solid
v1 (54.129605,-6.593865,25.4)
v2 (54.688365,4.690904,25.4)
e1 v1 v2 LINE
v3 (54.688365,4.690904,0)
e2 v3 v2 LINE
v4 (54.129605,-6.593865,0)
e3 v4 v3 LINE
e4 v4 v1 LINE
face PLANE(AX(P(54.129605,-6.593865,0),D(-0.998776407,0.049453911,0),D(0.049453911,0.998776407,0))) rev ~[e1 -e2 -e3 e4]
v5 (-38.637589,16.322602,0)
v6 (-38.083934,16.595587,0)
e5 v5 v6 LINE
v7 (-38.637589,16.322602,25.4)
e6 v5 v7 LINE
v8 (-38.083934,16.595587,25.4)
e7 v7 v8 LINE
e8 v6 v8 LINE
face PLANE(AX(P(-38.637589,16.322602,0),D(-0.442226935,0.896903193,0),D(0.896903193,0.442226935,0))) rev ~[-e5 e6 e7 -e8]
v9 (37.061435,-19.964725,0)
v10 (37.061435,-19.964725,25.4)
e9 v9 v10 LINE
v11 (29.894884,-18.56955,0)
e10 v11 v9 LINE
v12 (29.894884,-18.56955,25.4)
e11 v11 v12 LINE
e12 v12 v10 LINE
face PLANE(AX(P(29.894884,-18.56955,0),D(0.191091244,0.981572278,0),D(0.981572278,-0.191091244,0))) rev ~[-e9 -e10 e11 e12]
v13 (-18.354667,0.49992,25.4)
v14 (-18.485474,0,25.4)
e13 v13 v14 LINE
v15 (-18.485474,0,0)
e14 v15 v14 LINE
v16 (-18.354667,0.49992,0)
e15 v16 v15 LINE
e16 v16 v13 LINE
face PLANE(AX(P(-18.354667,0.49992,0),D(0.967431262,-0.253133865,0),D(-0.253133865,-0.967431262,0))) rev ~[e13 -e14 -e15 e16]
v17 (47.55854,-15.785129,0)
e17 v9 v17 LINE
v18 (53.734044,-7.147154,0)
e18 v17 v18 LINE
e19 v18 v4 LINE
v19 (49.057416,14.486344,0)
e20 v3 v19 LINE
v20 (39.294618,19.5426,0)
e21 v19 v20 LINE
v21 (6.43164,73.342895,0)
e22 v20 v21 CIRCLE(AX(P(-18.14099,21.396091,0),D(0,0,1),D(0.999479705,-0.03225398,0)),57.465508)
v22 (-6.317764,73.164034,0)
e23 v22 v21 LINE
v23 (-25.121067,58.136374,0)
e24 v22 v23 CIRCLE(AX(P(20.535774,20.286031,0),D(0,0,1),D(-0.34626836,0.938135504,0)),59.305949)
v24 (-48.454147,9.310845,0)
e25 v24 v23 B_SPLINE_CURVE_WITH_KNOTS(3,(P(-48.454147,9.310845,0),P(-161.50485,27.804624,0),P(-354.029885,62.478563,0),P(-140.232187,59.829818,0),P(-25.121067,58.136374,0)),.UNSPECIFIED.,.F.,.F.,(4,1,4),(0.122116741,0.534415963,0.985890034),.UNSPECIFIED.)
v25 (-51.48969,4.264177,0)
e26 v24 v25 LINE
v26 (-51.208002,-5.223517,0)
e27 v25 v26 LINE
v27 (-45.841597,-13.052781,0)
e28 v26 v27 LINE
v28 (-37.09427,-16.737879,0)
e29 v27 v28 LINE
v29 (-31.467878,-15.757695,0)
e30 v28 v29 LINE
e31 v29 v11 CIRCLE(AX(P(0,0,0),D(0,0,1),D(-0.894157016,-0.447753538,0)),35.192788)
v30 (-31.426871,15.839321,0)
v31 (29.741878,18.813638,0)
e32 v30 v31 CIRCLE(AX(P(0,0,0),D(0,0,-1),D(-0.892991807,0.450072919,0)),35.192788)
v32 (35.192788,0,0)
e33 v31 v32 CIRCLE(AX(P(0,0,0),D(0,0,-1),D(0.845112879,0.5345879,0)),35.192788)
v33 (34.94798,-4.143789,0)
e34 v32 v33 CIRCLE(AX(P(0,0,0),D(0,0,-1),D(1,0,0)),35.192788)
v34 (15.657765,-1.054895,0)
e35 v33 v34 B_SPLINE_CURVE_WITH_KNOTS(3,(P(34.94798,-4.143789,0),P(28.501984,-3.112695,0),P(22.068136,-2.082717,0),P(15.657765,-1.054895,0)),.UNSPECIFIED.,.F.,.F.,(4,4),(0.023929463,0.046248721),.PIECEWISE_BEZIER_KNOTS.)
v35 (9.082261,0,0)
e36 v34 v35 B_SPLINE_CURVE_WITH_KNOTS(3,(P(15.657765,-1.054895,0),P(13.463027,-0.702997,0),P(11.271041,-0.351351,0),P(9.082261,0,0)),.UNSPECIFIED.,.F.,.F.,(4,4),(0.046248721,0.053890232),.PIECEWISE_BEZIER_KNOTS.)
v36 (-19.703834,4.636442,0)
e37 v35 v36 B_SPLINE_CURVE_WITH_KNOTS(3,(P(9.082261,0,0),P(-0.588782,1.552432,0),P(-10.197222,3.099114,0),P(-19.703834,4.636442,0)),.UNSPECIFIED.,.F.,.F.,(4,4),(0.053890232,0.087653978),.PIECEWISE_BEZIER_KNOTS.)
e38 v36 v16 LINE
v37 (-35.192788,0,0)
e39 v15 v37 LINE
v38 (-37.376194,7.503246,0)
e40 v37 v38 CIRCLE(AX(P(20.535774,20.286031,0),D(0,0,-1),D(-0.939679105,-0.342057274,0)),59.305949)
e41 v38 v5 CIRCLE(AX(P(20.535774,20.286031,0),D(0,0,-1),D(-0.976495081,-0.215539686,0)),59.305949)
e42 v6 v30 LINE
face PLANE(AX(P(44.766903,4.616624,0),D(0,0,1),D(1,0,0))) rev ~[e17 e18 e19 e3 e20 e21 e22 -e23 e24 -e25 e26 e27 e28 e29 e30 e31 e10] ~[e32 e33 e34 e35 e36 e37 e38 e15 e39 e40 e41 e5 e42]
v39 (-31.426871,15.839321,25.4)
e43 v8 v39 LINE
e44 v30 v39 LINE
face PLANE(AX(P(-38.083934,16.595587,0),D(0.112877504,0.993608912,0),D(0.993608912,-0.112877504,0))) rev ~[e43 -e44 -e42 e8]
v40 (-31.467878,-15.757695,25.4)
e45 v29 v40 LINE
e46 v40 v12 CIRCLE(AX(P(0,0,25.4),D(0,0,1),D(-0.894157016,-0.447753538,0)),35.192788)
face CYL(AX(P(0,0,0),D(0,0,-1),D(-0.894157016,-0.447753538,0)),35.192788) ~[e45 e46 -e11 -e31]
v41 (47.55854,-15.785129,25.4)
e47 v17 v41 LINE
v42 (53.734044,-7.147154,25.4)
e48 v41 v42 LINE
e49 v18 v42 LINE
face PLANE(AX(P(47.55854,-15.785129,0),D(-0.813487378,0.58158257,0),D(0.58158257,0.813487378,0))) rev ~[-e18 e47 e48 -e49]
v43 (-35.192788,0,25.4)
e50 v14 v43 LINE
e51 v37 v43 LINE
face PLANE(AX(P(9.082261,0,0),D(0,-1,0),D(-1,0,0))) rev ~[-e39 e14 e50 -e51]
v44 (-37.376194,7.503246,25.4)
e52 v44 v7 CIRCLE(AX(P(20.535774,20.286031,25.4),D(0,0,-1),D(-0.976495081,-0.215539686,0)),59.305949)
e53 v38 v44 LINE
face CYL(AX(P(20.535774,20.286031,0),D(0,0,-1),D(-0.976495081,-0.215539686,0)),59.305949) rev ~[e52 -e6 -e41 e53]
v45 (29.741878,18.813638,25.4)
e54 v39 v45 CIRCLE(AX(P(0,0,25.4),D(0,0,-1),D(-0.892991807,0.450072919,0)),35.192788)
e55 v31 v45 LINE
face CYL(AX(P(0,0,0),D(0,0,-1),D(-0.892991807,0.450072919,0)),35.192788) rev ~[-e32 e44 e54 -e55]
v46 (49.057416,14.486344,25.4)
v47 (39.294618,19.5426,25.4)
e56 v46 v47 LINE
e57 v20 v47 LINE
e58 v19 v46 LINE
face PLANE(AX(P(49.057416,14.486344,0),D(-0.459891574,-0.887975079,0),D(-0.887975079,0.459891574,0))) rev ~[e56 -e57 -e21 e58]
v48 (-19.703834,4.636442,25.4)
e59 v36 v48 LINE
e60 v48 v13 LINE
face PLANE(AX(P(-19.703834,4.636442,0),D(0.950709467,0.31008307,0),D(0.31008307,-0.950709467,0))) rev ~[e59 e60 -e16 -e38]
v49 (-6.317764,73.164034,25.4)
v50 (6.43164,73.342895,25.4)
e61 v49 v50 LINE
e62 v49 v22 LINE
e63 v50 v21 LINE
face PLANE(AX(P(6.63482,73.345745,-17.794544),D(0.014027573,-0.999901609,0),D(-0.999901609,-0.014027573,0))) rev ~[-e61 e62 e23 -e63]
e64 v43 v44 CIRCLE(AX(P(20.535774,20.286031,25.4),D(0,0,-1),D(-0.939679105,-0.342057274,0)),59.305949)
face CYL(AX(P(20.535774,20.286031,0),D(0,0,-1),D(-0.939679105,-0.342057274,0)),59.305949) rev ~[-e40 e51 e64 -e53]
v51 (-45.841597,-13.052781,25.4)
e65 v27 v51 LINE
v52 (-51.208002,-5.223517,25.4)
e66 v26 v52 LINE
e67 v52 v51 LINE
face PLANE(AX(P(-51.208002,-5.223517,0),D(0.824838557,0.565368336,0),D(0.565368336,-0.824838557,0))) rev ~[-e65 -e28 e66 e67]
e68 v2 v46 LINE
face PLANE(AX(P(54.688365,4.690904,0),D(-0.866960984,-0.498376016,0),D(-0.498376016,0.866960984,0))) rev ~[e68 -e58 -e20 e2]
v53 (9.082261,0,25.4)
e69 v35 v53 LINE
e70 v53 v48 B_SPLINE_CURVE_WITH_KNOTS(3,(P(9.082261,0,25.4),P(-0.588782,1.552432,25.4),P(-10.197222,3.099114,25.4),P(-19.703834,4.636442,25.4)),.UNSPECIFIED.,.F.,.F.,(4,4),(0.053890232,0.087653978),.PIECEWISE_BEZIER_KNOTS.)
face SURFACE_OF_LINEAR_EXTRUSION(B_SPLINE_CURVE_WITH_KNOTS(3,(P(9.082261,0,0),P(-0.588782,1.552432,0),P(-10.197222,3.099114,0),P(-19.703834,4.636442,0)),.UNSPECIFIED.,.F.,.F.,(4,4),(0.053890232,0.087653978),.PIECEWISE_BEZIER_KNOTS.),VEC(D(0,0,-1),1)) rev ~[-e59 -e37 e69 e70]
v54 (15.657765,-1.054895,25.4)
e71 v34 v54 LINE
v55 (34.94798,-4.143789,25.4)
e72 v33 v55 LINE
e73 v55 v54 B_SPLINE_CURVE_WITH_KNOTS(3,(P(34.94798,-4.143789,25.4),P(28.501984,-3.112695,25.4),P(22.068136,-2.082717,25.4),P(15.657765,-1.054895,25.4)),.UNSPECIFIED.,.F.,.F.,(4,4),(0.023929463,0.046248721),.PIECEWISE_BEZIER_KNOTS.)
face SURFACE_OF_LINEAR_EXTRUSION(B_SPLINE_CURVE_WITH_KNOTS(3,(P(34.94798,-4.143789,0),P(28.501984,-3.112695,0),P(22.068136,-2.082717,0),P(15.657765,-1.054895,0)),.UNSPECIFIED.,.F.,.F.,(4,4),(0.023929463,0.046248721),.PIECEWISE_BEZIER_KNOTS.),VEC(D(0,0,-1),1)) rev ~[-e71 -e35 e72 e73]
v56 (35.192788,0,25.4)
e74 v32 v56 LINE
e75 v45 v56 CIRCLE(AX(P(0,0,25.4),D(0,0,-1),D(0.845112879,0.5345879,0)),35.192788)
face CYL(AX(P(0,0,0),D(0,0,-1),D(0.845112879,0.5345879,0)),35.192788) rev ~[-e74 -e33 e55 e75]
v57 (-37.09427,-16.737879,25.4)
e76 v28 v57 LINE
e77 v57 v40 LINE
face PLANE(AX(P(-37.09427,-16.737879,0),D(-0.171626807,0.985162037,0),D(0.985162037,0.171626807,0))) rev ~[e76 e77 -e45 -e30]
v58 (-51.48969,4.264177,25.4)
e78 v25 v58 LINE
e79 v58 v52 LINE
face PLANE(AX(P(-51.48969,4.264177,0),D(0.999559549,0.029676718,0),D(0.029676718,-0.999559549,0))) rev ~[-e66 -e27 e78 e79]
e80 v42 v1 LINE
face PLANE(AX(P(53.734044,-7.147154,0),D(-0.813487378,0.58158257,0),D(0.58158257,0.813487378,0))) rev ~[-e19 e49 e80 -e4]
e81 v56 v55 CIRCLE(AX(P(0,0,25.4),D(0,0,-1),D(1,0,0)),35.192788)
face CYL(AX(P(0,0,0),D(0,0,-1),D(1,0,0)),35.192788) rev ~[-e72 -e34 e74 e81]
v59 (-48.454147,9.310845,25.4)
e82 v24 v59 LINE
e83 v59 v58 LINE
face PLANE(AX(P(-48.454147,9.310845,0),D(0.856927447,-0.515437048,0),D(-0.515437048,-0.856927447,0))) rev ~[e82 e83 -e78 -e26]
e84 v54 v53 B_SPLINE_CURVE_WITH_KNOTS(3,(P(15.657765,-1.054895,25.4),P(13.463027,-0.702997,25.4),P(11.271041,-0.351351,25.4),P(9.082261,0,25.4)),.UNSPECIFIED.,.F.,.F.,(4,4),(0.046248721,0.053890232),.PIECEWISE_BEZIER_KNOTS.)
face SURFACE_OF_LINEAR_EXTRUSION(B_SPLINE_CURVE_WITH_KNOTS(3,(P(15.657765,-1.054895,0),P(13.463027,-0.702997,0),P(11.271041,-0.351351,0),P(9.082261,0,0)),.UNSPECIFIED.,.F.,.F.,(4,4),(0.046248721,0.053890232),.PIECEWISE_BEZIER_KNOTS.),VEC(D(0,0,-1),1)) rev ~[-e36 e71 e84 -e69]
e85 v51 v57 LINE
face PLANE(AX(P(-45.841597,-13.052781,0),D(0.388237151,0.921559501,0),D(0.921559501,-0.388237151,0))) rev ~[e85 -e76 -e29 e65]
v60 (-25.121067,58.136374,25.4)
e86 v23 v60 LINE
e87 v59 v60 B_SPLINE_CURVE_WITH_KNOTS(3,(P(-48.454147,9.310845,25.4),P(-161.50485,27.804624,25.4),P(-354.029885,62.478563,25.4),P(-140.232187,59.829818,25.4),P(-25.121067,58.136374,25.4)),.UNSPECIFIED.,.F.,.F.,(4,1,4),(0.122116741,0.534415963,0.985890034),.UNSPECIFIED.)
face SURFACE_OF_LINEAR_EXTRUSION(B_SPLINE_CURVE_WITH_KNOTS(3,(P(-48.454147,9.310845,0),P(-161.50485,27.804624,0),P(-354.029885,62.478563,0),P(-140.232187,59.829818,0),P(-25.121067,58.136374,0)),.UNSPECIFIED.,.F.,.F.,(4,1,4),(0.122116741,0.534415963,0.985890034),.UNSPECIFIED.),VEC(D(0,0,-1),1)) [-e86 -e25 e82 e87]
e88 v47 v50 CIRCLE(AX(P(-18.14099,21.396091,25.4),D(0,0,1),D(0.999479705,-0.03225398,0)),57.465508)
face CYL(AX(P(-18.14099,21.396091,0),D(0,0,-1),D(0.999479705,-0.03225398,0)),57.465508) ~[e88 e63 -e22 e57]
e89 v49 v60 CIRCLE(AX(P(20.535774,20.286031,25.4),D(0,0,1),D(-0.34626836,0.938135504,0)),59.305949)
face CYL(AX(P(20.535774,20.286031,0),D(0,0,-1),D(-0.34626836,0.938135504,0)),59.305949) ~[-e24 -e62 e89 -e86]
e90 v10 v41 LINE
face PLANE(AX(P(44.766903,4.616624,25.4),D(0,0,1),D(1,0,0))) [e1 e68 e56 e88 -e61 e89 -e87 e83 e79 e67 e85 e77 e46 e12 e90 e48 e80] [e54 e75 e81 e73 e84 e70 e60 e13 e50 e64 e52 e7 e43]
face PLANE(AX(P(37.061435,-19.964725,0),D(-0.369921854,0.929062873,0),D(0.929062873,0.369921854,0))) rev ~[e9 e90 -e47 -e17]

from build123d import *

# Parameters (mm, degrees)
F1_DEPTH    = 25.4
F2_DEPTH    = 25.4
F3_T1_DEPTH = 60.9890887747


# Not quite as in the source:
# - a fillet or chamfer that OpenCascade refuses, or shapes differently, is made with other operations: its cross-section is extruded or revolved along the edge and cut away or added


with BuildPart() as f1:
    # F0 (on Top) → F1 (new body)
    with BuildSketch(Plane.XY):
        with BuildLine():
            Line((0, 0), (9.0822612578, 0))
            add(Edge.make_bspline(
                [(9.0822612578, 0), (-0.5887823283, 1.5524321895), (-10.1972217153, 3.0991138841), (-19.7038336111, 4.636442237)],
                knots=[0.053890232, 0.053890232, 0.053890232, 0.053890232, 0.0876539783, 0.0876539783, 0.0876539783, 0.0876539783], degree=3))
            Line((-19.7038336111, 4.636442237), (-18.3546670651, 0.4999203421))
            Line((-18.3546670651, 0.4999203421), (-18.4854740521, 0))
            Line((-18.4854740521, 0), (0, 0))
        make_face()
    extrude(amount=F1_DEPTH)

    # F0 (on Top) → F2 (join)
    with BuildSketch(Plane.XY):
        with BuildLine():
            ThreePointArc((39.2946183394, 19.5425995517), (38.0990536847, 9.5917687024), (35.1927875929, 0))
            ThreePointArc((35.1927875929, 0), (35.1315324061, -2.0755070121), (34.9479800825, -4.1437889318))
            add(Edge.make_bspline(
                [(53.7340444048, -7.1471543317), (47.4674866948, -6.1456158537), (41.202016032, -5.1441772263), (34.9479800825, -4.1437889318)],
                knots=[0.0022748674, 0.0022748674, 0.0022748674, 0.0022748674, 0.0239294634, 0.0239294634, 0.0239294634, 0.0239294634], degree=3))
            Line((53.7340444048, -7.1471543317), (54.1296049181, -6.5938649088))
            Line((54.1296049181, -6.5938649088), (54.6883645828, 4.6909042491))
            Line((54.6883645828, 4.6909042491), (49.0574163024, 14.4863444523))
            Line((49.0574163024, 14.4863444523), (39.2946183394, 19.5425995517))
        make_face()
        with BuildLine():
            ThreePointArc((29.7418780254, 18.8136384064), (33.8026026699, 9.793689361), (35.1927875929, 0))
            ThreePointArc((35.1927875929, 0), (38.0990536847, 9.5917687024), (39.2946183394, 19.5425995517))
            Line((39.2946183394, 19.5425995517), (39.0245463695, 19.6824726475))
            Line((39.0245463695, 19.6824726475), (29.7418780254, 18.8136384064))
        make_face()
        with BuildLine():
            ThreePointArc((-31.426870984, 15.839320652), (-1.7092225846, 35.1512568298), (29.7418780254, 18.8136384064))
            Line((29.7418780254, 18.8136384064), (39.0245463695, 19.6824726475))
            Line((39.0245463695, 19.6824726475), (39.2946183394, 19.5425995517))
            ThreePointArc((39.2946183394, 19.5425995517), (29.0039385515, 54.2539705519), (0, 75.9230479598))
            ThreePointArc((0, 75.9230479598), (-13.7345779986, 68.6878764709), (-25.1210674885, 58.1363743803))
            ThreePointArc((-25.1210674885, 58.1363743803), (-35.8950760367, 38.527599561), (-38.637588859, 16.3226016208))
            Line((-38.637588859, 16.3226016208), (-38.0839338665, 16.5955866568))
            Line((-38.0839338665, 16.5955866568), (-31.426870984, 15.839320652))
        make_face()
        with BuildLine():
            add(Edge.make_bspline(
                [(53.7340444048, -7.1471543317), (47.4674866948, -6.1456158537), (41.202016032, -5.1441772263), (34.9479800825, -4.1437889318)],
                knots=[0.0022748674, 0.0022748674, 0.0022748674, 0.0022748674, 0.0239294634, 0.0239294634, 0.0239294634, 0.0239294634], degree=3))
            ThreePointArc((34.9479800825, -4.1437889318), (33.2140769684, -11.6343194773), (29.8948841627, -18.56955033))
            Line((29.8948841627, -18.56955033), (37.0614353142, -19.964725406))
            Line((37.0614353142, -19.964725406), (47.5585395538, -15.7851285483))
            Line((47.5585395538, -15.7851285483), (53.7340444048, -7.1471543317))
        make_face()
        with BuildLine():
            ThreePointArc((29.8948841627, -18.56955033), (33.2140769684, -11.6343194773), (34.9479800825, -4.1437889318))
            add(Edge.make_bspline(
                [(34.9479800825, -4.1437889318), (28.5019841788, -3.1126949471), (22.0681357101, -2.0827167623), (15.6577647144, -1.0548950957)],
                knots=[0.0239294634, 0.0239294634, 0.0239294634, 0.0239294634, 0.0462487206, 0.0462487206, 0.0462487206, 0.0462487206], degree=3))
            Line((15.6577647144, -1.0548950956), (17.8084989026, -9.9934284194))
            Line((17.8084989026, -9.9934284194), (25.9710486263, -17.8056630113))
            Line((25.9710486263, -17.8056630113), (29.8948841627, -18.56955033))
        make_face()
        with BuildLine():
            ThreePointArc((-31.4678779331, -15.7576951661), (-1.6109654608, -35.1558969285), (29.8948841627, -18.56955033))
            Line((29.8948841627, -18.56955033), (25.9710486263, -17.8056630113))
            Line((25.9710486263, -17.8056630113), (17.8084989026, -9.9934284194))
            Line((17.8084989026, -9.9934284194), (15.6577647144, -1.0548950956))
            add(Edge.make_bspline(
                [(15.6577647144, -1.0548950957), (13.4630266479, -0.7029966893), (11.271040594, -0.3513510685), (9.0822612578, 0)],
                knots=[0.0462487206, 0.0462487206, 0.0462487206, 0.0462487206, 0.053890232, 0.053890232, 0.053890232, 0.053890232], degree=3))
            Line((9.0822612578, 0), (0, 0))
            Line((0, 0), (-18.4854740521, 0))
            Line((-18.4854740521, 0), (-20.7573818702, -8.6828154927))
            Line((-20.7573818702, -8.6828154927), (-27.7432359966, -15.1088187584))
            Line((-27.7432359966, -15.1088187584), (-31.4678779331, -15.7576951661))
        make_face()
        with BuildLine():
            Line((-37.0942701188, -16.7378788221), (-31.4678779331, -15.7576951661))
            ThreePointArc((-31.4678779331, -15.7576951661), (-34.2489024836, -8.0959852539), (-35.1927875929, 0))
            ThreePointArc((-35.1927875929, 0), (-36.4082086965, 3.7156215634), (-37.3761939959, 7.5032456896))
            add(Edge.make_bspline(
                [(-37.3761939959, 7.5032456896), (-41.0895221285, 8.1076779871), (-44.782988486, 8.7102858856), (-48.4541472769, 9.3108447276)],
                knots=[0.1087279171, 0.1087279171, 0.1087279171, 0.1087279171, 0.1221167407, 0.1221167407, 0.1221167407, 0.1221167407], degree=3))
            Line((-48.4541472769, 9.3108447276), (-51.4896897645, 4.2641766931))
            Line((-51.4896897645, 4.2641766931), (-51.2080020921, -5.2235168043))
            Line((-51.2080020921, -5.2235168043), (-45.8415969743, -13.052780624))
            Line((-45.8415969743, -13.052780624), (-37.0942701188, -16.7378788221))
        make_face()
        with BuildLine():
            ThreePointArc((-35.1927875929, 0), (-34.2489024836, -8.0959852539), (-31.4678779331, -15.7576951661))
            Line((-31.4678779331, -15.7576951661), (-27.7432359966, -15.1088187584))
            Line((-27.7432359966, -15.1088187584), (-20.7573818702, -8.6828154927))
            Line((-20.7573818702, -8.6828154927), (-18.4854740521, 0))
            Line((-18.4854740521, 0), (-35.1927875929, 0))
        make_face()
        with BuildLine():
            ThreePointArc((-38.637588859, 16.3226016208), (-35.8950760367, 38.527599561), (-25.1210674885, 58.1363743803))
            add(Edge.make_bspline(
                [(-48.4541472769, 9.3108447276), (-161.5048500043, 27.8046236609), (-354.0298848729, 62.4785632102), (-140.2321873005, 59.829817618), (-25.1210674885, 58.1363743803)],
                knots=[0.1221167407, 0.1221167407, 0.1221167407, 0.1221167407, 0.5344159633, 0.9858900342, 0.9858900342, 0.9858900342, 0.9858900342], degree=3))
            Line((-48.4541472769, 9.3108447276), (-46.5972261458, 12.3980242197))
            Line((-46.5972261458, 12.3980242197), (-38.637588859, 16.3226016208))
        make_face()
        with BuildLine():
            add(Edge.make_bspline(
                [(-37.3761939959, 7.5032456896), (-41.0895221285, 8.1076779871), (-44.782988486, 8.7102858856), (-48.4541472769, 9.3108447276)],
                knots=[0.1087279171, 0.1087279171, 0.1087279171, 0.1087279171, 0.1221167407, 0.1221167407, 0.1221167407, 0.1221167407], degree=3))
            ThreePointArc((-37.3761939959, 7.5032456896), (-38.172734201, 11.8892038706), (-38.637588859, 16.3226016208))
            Line((-38.637588859, 16.3226016208), (-46.5972261458, 12.3980242197))
            Line((-46.5972261458, 12.3980242197), (-48.4541472769, 9.3108447276))
        make_face()
    extrude(amount=F2_DEPTH)

    # F3: chamfer of 5.08 on 1 edges, made by hand

    # F3_s2 → F3_t1 (cut)
    with BuildSketch(Plane.XY.offset(-17.7945443873)):
        with BuildLine():
            Line((6.6348201683, 73.3457449263), (-6.5209439135, 73.161183328))
            Line((-6.5209439135, 73.161183328), (-6.5669480575, 73.2517712893))
            ThreePointArc((-6.5669480575, 73.2517712893), (-3.3257137482, 74.6908686941), (-0.0351808653, 76.018362527))
            Line((-0.0351808653, 76.018362527), (0.0320735811, 76.019452552))
            ThreePointArc((0.0320735811, 76.019452552), (3.3798158566, 74.7892252054), (6.6782649991, 73.4375877631))
            Line((6.6782649991, 73.4375877631), (6.6348201683, 73.3457449263))
        make_face()
    extrude(amount=F3_T1_DEPTH, mode=Mode.SUBTRACT)


solid = f1.part
